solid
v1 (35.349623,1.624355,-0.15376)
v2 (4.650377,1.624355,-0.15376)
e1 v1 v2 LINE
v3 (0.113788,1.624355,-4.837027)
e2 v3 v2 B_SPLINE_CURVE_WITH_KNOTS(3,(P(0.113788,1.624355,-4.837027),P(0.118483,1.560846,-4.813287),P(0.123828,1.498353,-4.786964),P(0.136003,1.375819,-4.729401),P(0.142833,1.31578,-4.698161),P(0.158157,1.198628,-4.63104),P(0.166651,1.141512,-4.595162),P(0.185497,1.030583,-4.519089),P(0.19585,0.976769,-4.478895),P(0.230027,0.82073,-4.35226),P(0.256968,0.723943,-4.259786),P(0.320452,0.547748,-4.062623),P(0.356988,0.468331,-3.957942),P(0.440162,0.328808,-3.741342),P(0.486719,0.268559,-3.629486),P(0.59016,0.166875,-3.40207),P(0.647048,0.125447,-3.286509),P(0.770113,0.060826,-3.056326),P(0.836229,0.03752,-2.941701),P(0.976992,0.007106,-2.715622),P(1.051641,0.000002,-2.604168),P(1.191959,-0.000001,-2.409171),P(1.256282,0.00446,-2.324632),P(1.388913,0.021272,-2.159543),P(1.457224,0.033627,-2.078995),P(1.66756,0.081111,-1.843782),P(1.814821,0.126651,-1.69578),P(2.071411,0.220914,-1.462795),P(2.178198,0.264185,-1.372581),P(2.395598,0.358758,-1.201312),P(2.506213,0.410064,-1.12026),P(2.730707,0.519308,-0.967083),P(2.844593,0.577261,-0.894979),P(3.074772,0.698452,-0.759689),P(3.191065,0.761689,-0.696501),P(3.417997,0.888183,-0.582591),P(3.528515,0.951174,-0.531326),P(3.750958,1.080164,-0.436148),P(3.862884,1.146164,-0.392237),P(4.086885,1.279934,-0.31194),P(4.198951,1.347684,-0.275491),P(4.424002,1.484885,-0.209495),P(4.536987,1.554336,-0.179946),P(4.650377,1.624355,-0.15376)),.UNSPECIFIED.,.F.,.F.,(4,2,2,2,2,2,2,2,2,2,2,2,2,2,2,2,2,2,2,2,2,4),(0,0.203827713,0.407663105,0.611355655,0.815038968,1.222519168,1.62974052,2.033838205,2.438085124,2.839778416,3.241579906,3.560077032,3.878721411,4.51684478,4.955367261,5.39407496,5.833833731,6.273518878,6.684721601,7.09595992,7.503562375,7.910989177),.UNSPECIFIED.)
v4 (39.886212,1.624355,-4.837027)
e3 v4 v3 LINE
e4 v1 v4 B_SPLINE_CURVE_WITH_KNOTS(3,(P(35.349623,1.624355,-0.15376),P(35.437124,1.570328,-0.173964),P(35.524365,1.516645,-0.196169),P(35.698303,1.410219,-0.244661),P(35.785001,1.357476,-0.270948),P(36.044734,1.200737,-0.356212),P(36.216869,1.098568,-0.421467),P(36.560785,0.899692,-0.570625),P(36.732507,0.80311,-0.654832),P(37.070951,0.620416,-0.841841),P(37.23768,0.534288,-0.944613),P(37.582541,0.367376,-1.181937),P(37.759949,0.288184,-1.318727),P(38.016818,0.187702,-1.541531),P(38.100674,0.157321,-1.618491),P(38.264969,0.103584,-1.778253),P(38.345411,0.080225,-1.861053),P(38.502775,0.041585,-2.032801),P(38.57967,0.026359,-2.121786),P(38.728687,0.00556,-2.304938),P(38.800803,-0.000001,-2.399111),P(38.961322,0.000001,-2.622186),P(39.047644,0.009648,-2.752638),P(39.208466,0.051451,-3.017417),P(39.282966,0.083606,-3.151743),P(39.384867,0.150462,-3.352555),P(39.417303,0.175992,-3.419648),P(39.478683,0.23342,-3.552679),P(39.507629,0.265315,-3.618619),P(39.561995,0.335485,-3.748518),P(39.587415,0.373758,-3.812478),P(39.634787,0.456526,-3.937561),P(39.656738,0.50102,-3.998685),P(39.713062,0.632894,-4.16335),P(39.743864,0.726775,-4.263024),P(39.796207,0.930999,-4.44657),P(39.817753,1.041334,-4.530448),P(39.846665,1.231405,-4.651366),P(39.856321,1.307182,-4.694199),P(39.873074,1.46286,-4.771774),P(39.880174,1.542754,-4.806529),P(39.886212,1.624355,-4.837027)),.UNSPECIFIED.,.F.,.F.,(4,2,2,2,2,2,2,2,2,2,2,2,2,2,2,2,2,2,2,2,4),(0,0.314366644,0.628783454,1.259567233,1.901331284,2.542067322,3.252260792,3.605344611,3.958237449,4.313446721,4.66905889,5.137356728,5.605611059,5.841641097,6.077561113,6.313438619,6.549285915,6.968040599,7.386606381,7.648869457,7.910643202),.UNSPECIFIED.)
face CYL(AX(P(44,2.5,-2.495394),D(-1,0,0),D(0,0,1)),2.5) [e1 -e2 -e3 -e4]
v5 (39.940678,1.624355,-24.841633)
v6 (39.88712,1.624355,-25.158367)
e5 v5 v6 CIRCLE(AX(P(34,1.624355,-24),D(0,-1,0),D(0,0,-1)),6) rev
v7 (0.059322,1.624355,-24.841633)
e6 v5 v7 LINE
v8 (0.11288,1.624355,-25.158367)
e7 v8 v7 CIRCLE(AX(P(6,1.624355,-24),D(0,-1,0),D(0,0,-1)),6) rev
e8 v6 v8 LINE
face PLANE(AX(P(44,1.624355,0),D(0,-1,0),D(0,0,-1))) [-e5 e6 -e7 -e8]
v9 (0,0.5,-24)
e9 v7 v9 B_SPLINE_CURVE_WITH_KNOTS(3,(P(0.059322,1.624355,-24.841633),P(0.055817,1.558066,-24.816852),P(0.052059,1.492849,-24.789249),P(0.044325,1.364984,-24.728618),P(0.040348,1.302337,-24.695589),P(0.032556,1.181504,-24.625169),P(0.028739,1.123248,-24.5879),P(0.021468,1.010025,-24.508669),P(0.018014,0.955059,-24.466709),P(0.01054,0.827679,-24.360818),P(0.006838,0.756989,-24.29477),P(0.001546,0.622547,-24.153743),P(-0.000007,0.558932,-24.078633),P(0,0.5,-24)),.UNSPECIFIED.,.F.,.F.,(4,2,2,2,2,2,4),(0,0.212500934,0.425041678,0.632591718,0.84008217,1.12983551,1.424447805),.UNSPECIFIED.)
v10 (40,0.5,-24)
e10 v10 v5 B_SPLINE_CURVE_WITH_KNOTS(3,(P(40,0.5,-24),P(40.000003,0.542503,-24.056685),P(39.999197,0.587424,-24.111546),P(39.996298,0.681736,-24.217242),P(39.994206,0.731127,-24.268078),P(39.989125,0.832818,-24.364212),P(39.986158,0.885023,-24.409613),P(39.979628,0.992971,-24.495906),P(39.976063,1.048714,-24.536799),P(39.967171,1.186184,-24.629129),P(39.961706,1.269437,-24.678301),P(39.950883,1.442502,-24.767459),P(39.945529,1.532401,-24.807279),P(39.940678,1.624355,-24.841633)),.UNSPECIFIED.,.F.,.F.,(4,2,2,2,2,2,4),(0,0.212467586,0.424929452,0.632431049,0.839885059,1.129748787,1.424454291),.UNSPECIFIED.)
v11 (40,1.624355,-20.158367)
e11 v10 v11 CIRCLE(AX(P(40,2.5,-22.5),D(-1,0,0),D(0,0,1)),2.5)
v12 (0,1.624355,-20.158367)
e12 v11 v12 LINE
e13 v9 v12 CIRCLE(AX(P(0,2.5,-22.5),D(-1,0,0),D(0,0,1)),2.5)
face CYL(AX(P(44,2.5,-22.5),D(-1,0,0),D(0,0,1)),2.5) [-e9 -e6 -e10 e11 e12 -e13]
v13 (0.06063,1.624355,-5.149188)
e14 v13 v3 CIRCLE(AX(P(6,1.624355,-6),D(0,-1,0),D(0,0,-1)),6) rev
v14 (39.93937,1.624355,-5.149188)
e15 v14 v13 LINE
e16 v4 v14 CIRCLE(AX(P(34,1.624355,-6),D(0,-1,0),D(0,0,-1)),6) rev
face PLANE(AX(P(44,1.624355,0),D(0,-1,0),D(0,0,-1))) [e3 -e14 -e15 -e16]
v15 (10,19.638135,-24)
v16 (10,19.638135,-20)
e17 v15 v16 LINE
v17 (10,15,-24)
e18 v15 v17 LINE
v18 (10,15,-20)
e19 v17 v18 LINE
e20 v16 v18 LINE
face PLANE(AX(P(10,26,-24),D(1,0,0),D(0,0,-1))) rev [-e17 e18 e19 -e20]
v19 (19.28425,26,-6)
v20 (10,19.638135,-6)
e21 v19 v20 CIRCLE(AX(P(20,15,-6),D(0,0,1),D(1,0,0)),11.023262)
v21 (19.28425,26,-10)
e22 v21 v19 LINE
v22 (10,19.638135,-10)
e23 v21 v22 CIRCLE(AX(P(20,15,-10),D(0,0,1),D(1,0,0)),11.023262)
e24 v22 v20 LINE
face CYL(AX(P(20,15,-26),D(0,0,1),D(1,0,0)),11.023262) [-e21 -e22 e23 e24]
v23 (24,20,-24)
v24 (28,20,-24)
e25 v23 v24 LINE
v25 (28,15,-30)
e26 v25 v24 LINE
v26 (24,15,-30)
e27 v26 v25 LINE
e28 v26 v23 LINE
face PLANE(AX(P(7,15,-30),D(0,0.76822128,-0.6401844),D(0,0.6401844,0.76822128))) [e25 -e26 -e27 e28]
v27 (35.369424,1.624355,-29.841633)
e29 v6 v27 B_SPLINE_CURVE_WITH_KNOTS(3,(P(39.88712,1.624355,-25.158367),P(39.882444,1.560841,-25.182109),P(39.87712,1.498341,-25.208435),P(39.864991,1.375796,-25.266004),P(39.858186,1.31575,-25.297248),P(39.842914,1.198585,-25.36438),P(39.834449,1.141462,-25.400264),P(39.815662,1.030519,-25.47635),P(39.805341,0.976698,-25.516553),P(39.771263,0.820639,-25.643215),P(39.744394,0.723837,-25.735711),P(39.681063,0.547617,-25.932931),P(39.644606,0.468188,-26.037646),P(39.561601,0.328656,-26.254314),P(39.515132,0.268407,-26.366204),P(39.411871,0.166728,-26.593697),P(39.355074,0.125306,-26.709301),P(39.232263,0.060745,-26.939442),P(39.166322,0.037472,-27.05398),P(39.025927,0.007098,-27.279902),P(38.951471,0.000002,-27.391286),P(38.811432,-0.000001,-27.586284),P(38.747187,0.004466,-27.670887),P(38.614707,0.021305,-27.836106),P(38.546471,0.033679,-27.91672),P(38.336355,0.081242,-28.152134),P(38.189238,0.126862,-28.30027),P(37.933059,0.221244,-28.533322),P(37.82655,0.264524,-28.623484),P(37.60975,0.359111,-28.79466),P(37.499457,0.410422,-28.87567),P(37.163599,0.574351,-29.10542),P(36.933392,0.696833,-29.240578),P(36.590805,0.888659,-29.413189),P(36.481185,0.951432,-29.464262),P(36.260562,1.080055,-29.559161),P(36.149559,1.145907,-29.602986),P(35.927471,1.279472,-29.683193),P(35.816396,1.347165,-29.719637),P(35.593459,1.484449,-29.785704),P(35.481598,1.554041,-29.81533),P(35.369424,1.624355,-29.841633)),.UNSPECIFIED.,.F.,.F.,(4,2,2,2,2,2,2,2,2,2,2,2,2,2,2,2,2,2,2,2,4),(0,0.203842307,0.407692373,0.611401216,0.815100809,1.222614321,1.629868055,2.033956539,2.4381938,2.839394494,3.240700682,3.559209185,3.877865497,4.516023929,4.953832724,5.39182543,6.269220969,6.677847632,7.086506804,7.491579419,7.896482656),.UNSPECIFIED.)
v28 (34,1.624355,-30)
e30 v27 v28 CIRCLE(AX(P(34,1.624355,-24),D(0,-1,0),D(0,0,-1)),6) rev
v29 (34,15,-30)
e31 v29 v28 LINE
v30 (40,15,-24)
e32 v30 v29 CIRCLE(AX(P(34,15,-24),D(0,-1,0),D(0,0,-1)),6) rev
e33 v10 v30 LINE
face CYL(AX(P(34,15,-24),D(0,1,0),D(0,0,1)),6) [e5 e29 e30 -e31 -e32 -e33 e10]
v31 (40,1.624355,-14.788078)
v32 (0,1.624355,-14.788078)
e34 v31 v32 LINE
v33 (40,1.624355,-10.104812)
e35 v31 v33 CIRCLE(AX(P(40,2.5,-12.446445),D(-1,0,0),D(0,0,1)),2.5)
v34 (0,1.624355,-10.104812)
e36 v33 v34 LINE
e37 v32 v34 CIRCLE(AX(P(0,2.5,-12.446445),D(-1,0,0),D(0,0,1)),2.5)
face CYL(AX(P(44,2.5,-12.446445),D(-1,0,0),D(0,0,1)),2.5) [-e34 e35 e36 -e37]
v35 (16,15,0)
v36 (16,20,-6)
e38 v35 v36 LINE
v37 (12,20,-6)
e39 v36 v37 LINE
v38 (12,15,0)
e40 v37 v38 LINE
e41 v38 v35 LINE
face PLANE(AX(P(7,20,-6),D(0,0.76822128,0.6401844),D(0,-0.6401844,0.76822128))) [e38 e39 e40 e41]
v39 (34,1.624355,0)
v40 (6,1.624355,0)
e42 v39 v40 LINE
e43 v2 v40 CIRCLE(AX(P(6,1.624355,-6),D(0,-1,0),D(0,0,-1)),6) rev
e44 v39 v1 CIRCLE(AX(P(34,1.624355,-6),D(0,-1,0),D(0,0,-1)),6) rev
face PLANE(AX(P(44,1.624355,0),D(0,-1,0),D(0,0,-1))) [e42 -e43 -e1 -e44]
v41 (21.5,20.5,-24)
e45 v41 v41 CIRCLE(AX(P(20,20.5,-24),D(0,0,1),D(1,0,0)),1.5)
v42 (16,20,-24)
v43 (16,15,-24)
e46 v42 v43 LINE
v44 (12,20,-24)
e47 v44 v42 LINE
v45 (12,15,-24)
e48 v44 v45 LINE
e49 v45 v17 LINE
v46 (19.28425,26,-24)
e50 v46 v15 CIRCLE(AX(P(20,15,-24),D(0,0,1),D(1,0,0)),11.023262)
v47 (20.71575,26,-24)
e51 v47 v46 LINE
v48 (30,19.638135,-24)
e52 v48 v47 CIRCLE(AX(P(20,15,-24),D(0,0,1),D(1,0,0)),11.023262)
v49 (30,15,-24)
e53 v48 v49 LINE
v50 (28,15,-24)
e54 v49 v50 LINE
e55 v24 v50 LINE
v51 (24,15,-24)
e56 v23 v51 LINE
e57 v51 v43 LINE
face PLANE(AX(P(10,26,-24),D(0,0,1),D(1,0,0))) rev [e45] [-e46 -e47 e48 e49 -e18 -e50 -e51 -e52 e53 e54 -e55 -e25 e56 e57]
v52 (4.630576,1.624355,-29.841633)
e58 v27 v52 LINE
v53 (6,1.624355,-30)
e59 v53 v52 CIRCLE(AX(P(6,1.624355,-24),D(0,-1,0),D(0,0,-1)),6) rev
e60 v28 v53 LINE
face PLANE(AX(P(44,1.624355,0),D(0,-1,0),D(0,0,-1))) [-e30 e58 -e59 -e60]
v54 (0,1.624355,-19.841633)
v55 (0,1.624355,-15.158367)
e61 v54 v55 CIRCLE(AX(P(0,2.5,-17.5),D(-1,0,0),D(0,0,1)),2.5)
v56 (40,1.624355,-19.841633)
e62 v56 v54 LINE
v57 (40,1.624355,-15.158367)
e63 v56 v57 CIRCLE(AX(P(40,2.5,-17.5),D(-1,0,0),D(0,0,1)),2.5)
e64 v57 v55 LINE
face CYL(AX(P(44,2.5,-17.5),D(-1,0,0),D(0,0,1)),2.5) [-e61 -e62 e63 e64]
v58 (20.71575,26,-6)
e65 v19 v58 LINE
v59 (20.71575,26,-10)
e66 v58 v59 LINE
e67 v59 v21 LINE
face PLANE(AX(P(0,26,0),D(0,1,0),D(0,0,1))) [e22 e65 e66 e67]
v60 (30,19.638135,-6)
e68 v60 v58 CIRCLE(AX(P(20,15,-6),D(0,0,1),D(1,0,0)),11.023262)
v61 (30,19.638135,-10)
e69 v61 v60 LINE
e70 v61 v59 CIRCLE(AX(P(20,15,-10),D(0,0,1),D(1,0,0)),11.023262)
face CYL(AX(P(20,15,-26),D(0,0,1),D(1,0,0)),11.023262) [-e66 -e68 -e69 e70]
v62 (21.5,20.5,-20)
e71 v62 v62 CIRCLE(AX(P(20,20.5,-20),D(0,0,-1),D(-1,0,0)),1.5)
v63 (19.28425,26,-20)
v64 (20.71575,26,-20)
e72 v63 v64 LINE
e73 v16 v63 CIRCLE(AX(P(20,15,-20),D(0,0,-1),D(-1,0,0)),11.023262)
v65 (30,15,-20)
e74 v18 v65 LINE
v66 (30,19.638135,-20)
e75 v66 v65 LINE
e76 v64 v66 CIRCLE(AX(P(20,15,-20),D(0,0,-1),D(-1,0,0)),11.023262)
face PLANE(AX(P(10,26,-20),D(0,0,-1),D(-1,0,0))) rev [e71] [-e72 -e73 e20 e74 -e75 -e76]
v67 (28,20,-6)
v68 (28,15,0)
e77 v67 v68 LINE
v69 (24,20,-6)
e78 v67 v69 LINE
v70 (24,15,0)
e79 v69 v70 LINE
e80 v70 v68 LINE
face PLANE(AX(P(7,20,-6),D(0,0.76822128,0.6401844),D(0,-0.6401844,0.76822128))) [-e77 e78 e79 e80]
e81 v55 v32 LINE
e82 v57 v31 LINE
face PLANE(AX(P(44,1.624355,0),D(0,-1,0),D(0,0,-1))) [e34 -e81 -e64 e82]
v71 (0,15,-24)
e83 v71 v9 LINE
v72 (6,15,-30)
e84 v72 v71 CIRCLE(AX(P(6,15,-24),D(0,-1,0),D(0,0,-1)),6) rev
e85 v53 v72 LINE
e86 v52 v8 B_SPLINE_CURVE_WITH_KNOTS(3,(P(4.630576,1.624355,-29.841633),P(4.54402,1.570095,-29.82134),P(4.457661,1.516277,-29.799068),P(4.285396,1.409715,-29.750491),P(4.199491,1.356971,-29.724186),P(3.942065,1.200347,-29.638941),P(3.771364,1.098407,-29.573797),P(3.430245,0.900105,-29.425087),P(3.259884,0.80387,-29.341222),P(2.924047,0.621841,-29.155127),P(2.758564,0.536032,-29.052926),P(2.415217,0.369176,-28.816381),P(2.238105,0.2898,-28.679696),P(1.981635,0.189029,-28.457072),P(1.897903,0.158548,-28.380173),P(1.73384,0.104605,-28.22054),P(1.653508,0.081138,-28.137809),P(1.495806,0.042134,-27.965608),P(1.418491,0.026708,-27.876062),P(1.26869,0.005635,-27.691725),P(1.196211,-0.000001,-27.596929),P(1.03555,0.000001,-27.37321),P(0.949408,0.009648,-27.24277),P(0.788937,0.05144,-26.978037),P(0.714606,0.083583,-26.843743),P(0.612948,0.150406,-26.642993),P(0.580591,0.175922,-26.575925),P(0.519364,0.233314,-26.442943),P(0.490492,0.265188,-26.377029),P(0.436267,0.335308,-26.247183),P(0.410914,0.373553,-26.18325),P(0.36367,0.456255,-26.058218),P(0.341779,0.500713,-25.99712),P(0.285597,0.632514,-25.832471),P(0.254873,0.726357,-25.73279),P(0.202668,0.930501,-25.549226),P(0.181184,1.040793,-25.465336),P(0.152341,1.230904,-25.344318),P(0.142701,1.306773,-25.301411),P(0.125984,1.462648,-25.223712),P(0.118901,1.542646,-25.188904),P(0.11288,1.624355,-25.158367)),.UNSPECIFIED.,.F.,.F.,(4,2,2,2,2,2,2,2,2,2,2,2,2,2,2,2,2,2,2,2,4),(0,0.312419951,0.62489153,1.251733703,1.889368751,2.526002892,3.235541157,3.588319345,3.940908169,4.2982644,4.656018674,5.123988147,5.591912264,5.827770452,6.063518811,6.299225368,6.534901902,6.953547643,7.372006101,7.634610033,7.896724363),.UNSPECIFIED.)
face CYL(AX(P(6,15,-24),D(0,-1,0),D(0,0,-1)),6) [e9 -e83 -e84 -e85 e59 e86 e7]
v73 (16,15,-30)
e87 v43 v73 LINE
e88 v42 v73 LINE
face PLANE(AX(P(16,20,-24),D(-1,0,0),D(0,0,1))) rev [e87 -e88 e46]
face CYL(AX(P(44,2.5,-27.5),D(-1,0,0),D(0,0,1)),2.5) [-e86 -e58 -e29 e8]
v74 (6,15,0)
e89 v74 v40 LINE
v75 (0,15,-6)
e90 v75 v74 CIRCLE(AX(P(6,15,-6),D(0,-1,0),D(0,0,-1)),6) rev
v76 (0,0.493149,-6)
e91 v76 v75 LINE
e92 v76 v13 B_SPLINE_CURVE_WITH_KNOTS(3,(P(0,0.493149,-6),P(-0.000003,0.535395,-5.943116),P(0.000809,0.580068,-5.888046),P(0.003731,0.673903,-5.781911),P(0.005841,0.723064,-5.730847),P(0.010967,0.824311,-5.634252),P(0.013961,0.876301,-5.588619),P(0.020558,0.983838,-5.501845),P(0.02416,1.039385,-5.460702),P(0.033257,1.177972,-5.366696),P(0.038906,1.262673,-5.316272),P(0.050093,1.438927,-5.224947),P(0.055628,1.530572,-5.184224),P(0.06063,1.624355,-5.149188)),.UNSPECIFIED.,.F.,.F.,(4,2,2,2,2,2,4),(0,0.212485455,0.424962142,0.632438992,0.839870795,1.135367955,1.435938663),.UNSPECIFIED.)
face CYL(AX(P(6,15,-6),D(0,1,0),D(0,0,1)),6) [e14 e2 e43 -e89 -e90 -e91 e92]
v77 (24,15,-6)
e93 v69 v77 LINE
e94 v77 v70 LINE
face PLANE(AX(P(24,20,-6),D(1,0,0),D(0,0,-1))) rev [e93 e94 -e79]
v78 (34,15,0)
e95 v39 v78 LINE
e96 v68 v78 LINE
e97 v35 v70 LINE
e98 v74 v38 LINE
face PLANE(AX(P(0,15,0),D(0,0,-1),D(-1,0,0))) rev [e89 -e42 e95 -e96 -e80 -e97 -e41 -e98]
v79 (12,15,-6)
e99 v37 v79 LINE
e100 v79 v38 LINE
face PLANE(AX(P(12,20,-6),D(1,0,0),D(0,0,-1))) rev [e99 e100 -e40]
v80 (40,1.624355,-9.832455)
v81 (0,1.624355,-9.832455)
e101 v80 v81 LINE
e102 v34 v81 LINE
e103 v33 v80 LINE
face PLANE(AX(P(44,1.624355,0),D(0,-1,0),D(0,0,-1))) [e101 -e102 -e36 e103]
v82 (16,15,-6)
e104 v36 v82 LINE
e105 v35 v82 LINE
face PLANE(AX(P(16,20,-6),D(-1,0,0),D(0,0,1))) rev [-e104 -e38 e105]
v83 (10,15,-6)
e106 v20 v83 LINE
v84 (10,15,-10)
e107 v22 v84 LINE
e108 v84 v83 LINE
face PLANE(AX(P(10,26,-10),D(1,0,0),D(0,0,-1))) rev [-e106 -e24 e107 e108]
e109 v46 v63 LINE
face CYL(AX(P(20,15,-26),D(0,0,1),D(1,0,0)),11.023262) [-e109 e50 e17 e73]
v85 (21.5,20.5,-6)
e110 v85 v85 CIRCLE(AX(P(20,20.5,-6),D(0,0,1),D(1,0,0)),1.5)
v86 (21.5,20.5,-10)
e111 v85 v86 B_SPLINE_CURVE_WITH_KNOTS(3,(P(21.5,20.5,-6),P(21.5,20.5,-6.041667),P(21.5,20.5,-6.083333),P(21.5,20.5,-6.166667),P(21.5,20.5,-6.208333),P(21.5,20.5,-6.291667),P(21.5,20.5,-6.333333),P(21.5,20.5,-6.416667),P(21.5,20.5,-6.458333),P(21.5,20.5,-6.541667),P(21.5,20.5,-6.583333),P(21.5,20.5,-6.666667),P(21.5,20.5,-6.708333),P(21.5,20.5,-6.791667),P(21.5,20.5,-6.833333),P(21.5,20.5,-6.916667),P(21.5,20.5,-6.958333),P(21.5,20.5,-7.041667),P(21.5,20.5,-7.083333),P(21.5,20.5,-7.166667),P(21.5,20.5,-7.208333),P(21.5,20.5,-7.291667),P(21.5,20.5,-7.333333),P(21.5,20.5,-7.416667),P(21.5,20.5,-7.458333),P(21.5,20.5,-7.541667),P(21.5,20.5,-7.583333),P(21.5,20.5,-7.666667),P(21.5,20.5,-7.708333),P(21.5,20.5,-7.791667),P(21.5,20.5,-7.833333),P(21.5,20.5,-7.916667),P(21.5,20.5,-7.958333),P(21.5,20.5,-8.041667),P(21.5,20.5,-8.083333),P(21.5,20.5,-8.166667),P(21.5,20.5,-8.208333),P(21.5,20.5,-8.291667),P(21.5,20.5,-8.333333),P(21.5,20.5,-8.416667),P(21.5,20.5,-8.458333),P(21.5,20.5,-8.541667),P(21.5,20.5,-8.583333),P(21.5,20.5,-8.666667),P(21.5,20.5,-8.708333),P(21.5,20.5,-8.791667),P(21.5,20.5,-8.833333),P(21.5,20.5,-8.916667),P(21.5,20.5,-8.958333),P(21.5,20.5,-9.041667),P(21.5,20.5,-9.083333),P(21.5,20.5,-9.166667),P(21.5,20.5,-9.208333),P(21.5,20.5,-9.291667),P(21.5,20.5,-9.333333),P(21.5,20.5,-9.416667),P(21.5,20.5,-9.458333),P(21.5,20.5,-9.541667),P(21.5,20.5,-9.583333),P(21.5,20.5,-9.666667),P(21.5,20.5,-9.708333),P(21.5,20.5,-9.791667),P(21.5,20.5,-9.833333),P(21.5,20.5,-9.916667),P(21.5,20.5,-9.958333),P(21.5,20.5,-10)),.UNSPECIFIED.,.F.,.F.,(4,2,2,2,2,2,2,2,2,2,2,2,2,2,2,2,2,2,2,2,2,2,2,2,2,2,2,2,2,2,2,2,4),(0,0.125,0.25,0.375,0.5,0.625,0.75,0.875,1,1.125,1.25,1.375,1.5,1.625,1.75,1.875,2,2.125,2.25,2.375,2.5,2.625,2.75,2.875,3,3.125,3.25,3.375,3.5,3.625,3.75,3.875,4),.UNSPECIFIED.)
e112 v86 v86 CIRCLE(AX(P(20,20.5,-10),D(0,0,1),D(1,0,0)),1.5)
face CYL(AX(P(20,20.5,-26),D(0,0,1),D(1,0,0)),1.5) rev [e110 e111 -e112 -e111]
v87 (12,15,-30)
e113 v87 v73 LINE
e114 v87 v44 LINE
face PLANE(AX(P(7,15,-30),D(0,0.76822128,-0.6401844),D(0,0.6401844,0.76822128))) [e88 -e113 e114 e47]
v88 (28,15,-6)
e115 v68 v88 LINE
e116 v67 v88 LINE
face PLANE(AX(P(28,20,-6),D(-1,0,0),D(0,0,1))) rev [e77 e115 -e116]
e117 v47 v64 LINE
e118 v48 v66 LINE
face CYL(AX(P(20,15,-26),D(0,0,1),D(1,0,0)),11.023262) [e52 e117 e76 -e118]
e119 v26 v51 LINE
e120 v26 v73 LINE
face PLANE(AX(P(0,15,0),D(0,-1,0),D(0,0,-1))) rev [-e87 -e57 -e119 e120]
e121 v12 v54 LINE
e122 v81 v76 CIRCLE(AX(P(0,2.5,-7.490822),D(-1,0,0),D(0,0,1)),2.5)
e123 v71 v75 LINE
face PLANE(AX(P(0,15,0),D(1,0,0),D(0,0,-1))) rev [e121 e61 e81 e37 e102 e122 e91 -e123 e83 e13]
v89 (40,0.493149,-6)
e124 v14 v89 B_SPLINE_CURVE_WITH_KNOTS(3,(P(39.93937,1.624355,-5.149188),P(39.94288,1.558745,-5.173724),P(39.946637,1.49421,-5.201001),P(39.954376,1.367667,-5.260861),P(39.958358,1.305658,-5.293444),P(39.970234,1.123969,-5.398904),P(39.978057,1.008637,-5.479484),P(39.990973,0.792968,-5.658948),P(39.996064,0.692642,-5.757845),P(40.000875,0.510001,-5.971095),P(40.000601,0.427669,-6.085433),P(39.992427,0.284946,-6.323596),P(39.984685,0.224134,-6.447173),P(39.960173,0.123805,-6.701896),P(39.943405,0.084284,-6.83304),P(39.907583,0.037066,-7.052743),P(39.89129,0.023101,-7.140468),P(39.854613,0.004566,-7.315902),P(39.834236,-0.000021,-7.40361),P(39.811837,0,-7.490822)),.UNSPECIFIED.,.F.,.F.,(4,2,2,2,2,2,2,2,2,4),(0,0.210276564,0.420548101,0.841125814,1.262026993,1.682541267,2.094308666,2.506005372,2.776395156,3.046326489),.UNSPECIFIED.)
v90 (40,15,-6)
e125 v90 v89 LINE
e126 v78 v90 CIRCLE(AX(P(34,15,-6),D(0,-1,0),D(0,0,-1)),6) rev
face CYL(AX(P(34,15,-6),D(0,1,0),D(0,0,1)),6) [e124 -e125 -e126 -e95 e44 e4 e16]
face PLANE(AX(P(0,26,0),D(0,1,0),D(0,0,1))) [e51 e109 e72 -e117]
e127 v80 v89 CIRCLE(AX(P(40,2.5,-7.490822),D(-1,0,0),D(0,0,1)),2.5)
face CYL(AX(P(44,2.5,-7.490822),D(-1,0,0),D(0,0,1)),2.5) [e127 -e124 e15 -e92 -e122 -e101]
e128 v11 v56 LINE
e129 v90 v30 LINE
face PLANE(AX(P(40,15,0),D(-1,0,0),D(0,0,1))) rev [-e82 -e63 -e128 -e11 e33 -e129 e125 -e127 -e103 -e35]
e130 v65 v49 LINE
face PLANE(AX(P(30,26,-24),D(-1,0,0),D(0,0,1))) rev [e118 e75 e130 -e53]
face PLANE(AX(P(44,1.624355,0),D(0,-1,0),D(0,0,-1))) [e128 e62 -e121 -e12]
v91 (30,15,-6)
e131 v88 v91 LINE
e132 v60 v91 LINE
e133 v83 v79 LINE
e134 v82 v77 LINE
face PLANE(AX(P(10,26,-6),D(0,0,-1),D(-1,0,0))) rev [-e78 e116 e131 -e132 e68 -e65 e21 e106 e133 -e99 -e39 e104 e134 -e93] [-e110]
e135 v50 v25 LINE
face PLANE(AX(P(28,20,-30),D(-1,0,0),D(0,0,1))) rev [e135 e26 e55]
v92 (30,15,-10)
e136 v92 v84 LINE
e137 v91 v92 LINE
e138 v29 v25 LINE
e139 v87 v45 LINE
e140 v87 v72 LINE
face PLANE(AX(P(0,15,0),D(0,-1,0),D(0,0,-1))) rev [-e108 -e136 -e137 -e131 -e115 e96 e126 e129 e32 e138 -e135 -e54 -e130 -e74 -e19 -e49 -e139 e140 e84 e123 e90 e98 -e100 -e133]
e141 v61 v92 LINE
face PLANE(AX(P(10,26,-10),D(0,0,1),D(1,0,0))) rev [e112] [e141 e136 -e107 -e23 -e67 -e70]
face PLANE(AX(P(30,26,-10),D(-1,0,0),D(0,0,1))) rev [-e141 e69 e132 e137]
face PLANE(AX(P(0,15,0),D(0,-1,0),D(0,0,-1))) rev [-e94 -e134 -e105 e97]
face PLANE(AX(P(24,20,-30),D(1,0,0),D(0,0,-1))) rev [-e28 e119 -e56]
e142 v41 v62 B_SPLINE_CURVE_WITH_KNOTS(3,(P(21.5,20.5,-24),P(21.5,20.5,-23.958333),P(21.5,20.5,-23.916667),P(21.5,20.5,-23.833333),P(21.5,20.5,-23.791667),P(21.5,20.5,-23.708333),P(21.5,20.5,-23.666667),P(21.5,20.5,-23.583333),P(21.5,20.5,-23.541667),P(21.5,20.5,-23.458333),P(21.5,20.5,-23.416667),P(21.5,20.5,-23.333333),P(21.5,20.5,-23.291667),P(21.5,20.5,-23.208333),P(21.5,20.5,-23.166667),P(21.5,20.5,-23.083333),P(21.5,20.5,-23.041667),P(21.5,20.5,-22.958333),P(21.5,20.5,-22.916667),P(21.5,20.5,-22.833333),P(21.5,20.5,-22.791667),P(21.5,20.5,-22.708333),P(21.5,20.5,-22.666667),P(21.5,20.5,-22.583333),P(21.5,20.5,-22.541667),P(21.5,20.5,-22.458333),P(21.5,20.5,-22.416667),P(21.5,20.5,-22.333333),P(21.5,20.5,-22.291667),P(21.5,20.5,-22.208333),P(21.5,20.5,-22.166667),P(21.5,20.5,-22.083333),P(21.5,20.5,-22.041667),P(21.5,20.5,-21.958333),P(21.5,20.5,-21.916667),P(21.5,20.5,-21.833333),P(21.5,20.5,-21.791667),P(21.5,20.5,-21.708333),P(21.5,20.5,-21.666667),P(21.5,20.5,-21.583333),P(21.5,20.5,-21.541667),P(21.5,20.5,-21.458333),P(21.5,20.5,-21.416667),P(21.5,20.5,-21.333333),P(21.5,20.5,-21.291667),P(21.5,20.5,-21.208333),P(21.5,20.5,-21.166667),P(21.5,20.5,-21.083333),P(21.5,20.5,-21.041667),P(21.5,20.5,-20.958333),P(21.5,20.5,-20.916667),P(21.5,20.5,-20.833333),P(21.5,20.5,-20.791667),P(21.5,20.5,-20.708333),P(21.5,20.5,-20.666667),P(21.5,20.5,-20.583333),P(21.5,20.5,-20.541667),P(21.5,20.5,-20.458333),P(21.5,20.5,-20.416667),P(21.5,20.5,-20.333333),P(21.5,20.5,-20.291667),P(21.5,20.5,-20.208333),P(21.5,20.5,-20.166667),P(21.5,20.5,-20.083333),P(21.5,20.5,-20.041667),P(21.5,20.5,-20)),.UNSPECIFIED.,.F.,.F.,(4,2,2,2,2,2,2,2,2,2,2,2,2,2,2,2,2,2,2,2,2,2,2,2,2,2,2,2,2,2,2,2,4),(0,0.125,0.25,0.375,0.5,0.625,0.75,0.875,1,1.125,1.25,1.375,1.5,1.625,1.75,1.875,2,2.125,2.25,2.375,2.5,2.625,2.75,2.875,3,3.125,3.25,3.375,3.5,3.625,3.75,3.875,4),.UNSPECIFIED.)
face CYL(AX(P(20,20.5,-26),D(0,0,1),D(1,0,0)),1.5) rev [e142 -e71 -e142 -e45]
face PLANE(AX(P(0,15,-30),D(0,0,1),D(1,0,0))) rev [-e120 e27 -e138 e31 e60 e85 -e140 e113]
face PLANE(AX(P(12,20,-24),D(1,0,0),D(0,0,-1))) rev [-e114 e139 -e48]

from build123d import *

# Parameters (mm, degrees)
SKETCH1_W           = 40
SKETCH1_H           = 30
BOSS_EXTRUDE1_DEPTH = 15
SKETCH2_W           = 20
SKETCH2_H           = 4
BOSS_EXTRUDE2_DEPTH = 11
SKETCH3_R           = 1.5
CUT_EXTRUDE1_DEPTH  = 20
SKETCH4_W           = 4
SKETCH4_H           = 6
BOSS_EXTRUDE3_DEPTH = 5
CUT_EXTRUDE2_DEPTH  = 21
FILLET7_R           = 6
FILLET8_R           = 6
FILLET9_R           = 6
FILLET10_R          = 6
CUT_EXTRUDE5_DEPTH  = 44


with BuildPart() as part:
    # Sketch1 → Boss-Extrude1 (new body)
    with BuildSketch(Plane(origin=(0, 0, 0), x_dir=(1, 0, 0), z_dir=(0, 1, 0))):
        with Locations((20, 15)):
            Rectangle(SKETCH1_W, SKETCH1_H)
    extrude(amount=BOSS_EXTRUDE1_DEPTH)

    # Sketch2 → Boss-Extrude2 (add)
    with BuildSketch(Plane(origin=(0, 15, 0), x_dir=(1, 0, 0), z_dir=(0, 1, 0))):
        with Locations((20, 22)):
            Rectangle(SKETCH2_W, SKETCH2_H)
        with Locations((20, 8)):
            Rectangle(SKETCH2_W, SKETCH2_H)
    extrude(amount=BOSS_EXTRUDE2_DEPTH)

    # Sketch3 → Cut-Extrude1 (cut)
    with BuildSketch(Plane.XY.offset(-6)):
        with BuildLine():
            Line((30, 26), (20.715749816, 26))
            ThreePointArc((20.715749816, 26), (26.230983436, 24.093247122), (30, 19.638135164))
            Line((30, 19.638135164), (30, 26))
        make_face()
        with BuildLine():
            Line((10, 26), (10, 19.638135164))
            ThreePointArc((10, 19.638135164), (13.769016564, 24.093247122), (19.284250184, 26))
            Line((19.284250184, 26), (10, 26))
        make_face()
        with Locations((20, 20.5)):
            Circle(SKETCH3_R)
    extrude(amount=-CUT_EXTRUDE1_DEPTH, mode=Mode.SUBTRACT)

    # Sketch4 → Boss-Extrude3 (add)
    with BuildSketch(Plane(origin=(0, 15, 0), x_dir=(1, 0, 0), z_dir=(0, 1, 0))):
        with Locations((14, 27)):
            Rectangle(SKETCH4_W, SKETCH4_H)
        with Locations((26, 27)):
            Rectangle(SKETCH4_W, SKETCH4_H)
        with Locations((14, 3)):
            Rectangle(SKETCH4_W, SKETCH4_H)
        with Locations((26, 3)):
            Rectangle(SKETCH4_W, SKETCH4_H)
    extrude(amount=BOSS_EXTRUDE3_DEPTH)

    # Sketch5 → Cut-Extrude2 (cut)
    with BuildSketch(Plane(origin=(28, 0, 0), x_dir=(0, 0, -1), z_dir=(1, 0, 0))):
        Polygon((0, 15), (0, 20), (6, 20), align=None)
        Polygon((24, 20), (30, 20), (30, 15), align=None)
    extrude(amount=-CUT_EXTRUDE2_DEPTH, mode=Mode.SUBTRACT)

    # Fillet7
    fillet7_edges = [part.edges().sort_by_distance(p)[0] for p in [
        (0, 7.5, 0),
    ]]
    fillet(fillet7_edges, radius=FILLET7_R)

    # Fillet8
    fillet8_edges = [part.edges().sort_by_distance(p)[0] for p in [
        (0, 7.5, -30),
    ]]
    fillet(fillet8_edges, radius=FILLET8_R)

    # Fillet9
    fillet9_edges = [part.edges().sort_by_distance(p)[0] for p in [
        (40, 7.5, -30),
    ]]
    fillet(fillet9_edges, radius=FILLET9_R)

    # Fillet10
    fillet10_edges = [part.edges().sort_by_distance(p)[0] for p in [
        (40, 7.5, 0),
    ]]
    fillet(fillet10_edges, radius=FILLET10_R)

    # Sketch6 → Cut-Extrude5 (cut)
    with BuildSketch(Plane.ZY):
        with BuildLine():
            Line((-29.841633208, 1.624355142), (-30, 1.624355142))
            Line((-30, 1.624355142), (-30, 0))
            Line((-30, 0), (-27.5, 0))
            ThreePointArc((-27.5, 0), (-28.924936464, 0.445844195), (-29.841633208, 1.624355142))
        make_face()
        with BuildLine():
            Line((-24.841633208, 1.624355142), (-25.158366792, 1.624355142))
            ThreePointArc((-25.158366792, 1.624355142), (-26.075063536, 0.445844195), (-27.5, 0))
            Line((-27.5, 0), (-22.5, 0))
            ThreePointArc((-22.5, 0), (-23.924936464, 0.445844195), (-24.841633208, 1.624355142))
        make_face()
        with BuildLine():
            ThreePointArc((-20.158366792, 1.624355142), (-21.075063536, 0.445844195), (-22.5, 0))
            Line((-22.5, 0), (-17.5, 0))
            ThreePointArc((-17.5, 0), (-18.924936464, 0.445844195), (-19.841633208, 1.624355142))
            Line((-19.841633208, 1.624355142), (-20.158366792, 1.624355142))
        make_face()
        with BuildLine():
            ThreePointArc((-15.158366792, 1.624355142), (-16.075063536, 0.445844195), (-17.5, 0))
            Line((-17.5, 0), (-12.446445225, 0))
            ThreePointArc((-12.446445225, 0), (-13.871381684, 0.445844197), (-14.788078425, 1.624355142))
            Line((-14.788078425, 1.624355142), (-15.158366792, 1.624355142))
        make_face()
        with BuildLine():
            ThreePointArc((-10.104812008, 1.624355142), (-11.021508756, 0.445844192), (-12.446445225, 0))
            Line((-12.446445225, 0), (-7.490821501, 0))
            ThreePointArc((-7.490821501, 0), (-8.915757965, 0.445844195), (-9.832454709, 1.624355142))
            Line((-9.832454709, 1.624355142), (-10.104812008, 1.624355142))
        make_face()
        with BuildLine():
            Line((-7.490821501, 0), (-2.495393592, 0))
            ThreePointArc((-2.495393592, 0), (-3.920330048, 0.445844198), (-4.837026787, 1.624355142))
            Line((-4.837026787, 1.624355142), (-5.149188292, 1.624355142))
            ThreePointArc((-5.149188292, 1.624355142), (-6.065885036, 0.445844195), (-7.490821501, 0))
        make_face()
        with BuildLine():
            ThreePointArc((-0.15376037, 1.624355142), (-1.07045712, 0.445844191), (-2.495393592, 0))
            Line((-2.495393592, 0), (0, 0))
            Line((0, 0), (0, 1.624355142))
            Line((0, 1.624355142), (-0.15376037, 1.624355142))
        make_face()
    extrude(amount=-CUT_EXTRUDE5_DEPTH, mode=Mode.SUBTRACT)


solid = part.part
